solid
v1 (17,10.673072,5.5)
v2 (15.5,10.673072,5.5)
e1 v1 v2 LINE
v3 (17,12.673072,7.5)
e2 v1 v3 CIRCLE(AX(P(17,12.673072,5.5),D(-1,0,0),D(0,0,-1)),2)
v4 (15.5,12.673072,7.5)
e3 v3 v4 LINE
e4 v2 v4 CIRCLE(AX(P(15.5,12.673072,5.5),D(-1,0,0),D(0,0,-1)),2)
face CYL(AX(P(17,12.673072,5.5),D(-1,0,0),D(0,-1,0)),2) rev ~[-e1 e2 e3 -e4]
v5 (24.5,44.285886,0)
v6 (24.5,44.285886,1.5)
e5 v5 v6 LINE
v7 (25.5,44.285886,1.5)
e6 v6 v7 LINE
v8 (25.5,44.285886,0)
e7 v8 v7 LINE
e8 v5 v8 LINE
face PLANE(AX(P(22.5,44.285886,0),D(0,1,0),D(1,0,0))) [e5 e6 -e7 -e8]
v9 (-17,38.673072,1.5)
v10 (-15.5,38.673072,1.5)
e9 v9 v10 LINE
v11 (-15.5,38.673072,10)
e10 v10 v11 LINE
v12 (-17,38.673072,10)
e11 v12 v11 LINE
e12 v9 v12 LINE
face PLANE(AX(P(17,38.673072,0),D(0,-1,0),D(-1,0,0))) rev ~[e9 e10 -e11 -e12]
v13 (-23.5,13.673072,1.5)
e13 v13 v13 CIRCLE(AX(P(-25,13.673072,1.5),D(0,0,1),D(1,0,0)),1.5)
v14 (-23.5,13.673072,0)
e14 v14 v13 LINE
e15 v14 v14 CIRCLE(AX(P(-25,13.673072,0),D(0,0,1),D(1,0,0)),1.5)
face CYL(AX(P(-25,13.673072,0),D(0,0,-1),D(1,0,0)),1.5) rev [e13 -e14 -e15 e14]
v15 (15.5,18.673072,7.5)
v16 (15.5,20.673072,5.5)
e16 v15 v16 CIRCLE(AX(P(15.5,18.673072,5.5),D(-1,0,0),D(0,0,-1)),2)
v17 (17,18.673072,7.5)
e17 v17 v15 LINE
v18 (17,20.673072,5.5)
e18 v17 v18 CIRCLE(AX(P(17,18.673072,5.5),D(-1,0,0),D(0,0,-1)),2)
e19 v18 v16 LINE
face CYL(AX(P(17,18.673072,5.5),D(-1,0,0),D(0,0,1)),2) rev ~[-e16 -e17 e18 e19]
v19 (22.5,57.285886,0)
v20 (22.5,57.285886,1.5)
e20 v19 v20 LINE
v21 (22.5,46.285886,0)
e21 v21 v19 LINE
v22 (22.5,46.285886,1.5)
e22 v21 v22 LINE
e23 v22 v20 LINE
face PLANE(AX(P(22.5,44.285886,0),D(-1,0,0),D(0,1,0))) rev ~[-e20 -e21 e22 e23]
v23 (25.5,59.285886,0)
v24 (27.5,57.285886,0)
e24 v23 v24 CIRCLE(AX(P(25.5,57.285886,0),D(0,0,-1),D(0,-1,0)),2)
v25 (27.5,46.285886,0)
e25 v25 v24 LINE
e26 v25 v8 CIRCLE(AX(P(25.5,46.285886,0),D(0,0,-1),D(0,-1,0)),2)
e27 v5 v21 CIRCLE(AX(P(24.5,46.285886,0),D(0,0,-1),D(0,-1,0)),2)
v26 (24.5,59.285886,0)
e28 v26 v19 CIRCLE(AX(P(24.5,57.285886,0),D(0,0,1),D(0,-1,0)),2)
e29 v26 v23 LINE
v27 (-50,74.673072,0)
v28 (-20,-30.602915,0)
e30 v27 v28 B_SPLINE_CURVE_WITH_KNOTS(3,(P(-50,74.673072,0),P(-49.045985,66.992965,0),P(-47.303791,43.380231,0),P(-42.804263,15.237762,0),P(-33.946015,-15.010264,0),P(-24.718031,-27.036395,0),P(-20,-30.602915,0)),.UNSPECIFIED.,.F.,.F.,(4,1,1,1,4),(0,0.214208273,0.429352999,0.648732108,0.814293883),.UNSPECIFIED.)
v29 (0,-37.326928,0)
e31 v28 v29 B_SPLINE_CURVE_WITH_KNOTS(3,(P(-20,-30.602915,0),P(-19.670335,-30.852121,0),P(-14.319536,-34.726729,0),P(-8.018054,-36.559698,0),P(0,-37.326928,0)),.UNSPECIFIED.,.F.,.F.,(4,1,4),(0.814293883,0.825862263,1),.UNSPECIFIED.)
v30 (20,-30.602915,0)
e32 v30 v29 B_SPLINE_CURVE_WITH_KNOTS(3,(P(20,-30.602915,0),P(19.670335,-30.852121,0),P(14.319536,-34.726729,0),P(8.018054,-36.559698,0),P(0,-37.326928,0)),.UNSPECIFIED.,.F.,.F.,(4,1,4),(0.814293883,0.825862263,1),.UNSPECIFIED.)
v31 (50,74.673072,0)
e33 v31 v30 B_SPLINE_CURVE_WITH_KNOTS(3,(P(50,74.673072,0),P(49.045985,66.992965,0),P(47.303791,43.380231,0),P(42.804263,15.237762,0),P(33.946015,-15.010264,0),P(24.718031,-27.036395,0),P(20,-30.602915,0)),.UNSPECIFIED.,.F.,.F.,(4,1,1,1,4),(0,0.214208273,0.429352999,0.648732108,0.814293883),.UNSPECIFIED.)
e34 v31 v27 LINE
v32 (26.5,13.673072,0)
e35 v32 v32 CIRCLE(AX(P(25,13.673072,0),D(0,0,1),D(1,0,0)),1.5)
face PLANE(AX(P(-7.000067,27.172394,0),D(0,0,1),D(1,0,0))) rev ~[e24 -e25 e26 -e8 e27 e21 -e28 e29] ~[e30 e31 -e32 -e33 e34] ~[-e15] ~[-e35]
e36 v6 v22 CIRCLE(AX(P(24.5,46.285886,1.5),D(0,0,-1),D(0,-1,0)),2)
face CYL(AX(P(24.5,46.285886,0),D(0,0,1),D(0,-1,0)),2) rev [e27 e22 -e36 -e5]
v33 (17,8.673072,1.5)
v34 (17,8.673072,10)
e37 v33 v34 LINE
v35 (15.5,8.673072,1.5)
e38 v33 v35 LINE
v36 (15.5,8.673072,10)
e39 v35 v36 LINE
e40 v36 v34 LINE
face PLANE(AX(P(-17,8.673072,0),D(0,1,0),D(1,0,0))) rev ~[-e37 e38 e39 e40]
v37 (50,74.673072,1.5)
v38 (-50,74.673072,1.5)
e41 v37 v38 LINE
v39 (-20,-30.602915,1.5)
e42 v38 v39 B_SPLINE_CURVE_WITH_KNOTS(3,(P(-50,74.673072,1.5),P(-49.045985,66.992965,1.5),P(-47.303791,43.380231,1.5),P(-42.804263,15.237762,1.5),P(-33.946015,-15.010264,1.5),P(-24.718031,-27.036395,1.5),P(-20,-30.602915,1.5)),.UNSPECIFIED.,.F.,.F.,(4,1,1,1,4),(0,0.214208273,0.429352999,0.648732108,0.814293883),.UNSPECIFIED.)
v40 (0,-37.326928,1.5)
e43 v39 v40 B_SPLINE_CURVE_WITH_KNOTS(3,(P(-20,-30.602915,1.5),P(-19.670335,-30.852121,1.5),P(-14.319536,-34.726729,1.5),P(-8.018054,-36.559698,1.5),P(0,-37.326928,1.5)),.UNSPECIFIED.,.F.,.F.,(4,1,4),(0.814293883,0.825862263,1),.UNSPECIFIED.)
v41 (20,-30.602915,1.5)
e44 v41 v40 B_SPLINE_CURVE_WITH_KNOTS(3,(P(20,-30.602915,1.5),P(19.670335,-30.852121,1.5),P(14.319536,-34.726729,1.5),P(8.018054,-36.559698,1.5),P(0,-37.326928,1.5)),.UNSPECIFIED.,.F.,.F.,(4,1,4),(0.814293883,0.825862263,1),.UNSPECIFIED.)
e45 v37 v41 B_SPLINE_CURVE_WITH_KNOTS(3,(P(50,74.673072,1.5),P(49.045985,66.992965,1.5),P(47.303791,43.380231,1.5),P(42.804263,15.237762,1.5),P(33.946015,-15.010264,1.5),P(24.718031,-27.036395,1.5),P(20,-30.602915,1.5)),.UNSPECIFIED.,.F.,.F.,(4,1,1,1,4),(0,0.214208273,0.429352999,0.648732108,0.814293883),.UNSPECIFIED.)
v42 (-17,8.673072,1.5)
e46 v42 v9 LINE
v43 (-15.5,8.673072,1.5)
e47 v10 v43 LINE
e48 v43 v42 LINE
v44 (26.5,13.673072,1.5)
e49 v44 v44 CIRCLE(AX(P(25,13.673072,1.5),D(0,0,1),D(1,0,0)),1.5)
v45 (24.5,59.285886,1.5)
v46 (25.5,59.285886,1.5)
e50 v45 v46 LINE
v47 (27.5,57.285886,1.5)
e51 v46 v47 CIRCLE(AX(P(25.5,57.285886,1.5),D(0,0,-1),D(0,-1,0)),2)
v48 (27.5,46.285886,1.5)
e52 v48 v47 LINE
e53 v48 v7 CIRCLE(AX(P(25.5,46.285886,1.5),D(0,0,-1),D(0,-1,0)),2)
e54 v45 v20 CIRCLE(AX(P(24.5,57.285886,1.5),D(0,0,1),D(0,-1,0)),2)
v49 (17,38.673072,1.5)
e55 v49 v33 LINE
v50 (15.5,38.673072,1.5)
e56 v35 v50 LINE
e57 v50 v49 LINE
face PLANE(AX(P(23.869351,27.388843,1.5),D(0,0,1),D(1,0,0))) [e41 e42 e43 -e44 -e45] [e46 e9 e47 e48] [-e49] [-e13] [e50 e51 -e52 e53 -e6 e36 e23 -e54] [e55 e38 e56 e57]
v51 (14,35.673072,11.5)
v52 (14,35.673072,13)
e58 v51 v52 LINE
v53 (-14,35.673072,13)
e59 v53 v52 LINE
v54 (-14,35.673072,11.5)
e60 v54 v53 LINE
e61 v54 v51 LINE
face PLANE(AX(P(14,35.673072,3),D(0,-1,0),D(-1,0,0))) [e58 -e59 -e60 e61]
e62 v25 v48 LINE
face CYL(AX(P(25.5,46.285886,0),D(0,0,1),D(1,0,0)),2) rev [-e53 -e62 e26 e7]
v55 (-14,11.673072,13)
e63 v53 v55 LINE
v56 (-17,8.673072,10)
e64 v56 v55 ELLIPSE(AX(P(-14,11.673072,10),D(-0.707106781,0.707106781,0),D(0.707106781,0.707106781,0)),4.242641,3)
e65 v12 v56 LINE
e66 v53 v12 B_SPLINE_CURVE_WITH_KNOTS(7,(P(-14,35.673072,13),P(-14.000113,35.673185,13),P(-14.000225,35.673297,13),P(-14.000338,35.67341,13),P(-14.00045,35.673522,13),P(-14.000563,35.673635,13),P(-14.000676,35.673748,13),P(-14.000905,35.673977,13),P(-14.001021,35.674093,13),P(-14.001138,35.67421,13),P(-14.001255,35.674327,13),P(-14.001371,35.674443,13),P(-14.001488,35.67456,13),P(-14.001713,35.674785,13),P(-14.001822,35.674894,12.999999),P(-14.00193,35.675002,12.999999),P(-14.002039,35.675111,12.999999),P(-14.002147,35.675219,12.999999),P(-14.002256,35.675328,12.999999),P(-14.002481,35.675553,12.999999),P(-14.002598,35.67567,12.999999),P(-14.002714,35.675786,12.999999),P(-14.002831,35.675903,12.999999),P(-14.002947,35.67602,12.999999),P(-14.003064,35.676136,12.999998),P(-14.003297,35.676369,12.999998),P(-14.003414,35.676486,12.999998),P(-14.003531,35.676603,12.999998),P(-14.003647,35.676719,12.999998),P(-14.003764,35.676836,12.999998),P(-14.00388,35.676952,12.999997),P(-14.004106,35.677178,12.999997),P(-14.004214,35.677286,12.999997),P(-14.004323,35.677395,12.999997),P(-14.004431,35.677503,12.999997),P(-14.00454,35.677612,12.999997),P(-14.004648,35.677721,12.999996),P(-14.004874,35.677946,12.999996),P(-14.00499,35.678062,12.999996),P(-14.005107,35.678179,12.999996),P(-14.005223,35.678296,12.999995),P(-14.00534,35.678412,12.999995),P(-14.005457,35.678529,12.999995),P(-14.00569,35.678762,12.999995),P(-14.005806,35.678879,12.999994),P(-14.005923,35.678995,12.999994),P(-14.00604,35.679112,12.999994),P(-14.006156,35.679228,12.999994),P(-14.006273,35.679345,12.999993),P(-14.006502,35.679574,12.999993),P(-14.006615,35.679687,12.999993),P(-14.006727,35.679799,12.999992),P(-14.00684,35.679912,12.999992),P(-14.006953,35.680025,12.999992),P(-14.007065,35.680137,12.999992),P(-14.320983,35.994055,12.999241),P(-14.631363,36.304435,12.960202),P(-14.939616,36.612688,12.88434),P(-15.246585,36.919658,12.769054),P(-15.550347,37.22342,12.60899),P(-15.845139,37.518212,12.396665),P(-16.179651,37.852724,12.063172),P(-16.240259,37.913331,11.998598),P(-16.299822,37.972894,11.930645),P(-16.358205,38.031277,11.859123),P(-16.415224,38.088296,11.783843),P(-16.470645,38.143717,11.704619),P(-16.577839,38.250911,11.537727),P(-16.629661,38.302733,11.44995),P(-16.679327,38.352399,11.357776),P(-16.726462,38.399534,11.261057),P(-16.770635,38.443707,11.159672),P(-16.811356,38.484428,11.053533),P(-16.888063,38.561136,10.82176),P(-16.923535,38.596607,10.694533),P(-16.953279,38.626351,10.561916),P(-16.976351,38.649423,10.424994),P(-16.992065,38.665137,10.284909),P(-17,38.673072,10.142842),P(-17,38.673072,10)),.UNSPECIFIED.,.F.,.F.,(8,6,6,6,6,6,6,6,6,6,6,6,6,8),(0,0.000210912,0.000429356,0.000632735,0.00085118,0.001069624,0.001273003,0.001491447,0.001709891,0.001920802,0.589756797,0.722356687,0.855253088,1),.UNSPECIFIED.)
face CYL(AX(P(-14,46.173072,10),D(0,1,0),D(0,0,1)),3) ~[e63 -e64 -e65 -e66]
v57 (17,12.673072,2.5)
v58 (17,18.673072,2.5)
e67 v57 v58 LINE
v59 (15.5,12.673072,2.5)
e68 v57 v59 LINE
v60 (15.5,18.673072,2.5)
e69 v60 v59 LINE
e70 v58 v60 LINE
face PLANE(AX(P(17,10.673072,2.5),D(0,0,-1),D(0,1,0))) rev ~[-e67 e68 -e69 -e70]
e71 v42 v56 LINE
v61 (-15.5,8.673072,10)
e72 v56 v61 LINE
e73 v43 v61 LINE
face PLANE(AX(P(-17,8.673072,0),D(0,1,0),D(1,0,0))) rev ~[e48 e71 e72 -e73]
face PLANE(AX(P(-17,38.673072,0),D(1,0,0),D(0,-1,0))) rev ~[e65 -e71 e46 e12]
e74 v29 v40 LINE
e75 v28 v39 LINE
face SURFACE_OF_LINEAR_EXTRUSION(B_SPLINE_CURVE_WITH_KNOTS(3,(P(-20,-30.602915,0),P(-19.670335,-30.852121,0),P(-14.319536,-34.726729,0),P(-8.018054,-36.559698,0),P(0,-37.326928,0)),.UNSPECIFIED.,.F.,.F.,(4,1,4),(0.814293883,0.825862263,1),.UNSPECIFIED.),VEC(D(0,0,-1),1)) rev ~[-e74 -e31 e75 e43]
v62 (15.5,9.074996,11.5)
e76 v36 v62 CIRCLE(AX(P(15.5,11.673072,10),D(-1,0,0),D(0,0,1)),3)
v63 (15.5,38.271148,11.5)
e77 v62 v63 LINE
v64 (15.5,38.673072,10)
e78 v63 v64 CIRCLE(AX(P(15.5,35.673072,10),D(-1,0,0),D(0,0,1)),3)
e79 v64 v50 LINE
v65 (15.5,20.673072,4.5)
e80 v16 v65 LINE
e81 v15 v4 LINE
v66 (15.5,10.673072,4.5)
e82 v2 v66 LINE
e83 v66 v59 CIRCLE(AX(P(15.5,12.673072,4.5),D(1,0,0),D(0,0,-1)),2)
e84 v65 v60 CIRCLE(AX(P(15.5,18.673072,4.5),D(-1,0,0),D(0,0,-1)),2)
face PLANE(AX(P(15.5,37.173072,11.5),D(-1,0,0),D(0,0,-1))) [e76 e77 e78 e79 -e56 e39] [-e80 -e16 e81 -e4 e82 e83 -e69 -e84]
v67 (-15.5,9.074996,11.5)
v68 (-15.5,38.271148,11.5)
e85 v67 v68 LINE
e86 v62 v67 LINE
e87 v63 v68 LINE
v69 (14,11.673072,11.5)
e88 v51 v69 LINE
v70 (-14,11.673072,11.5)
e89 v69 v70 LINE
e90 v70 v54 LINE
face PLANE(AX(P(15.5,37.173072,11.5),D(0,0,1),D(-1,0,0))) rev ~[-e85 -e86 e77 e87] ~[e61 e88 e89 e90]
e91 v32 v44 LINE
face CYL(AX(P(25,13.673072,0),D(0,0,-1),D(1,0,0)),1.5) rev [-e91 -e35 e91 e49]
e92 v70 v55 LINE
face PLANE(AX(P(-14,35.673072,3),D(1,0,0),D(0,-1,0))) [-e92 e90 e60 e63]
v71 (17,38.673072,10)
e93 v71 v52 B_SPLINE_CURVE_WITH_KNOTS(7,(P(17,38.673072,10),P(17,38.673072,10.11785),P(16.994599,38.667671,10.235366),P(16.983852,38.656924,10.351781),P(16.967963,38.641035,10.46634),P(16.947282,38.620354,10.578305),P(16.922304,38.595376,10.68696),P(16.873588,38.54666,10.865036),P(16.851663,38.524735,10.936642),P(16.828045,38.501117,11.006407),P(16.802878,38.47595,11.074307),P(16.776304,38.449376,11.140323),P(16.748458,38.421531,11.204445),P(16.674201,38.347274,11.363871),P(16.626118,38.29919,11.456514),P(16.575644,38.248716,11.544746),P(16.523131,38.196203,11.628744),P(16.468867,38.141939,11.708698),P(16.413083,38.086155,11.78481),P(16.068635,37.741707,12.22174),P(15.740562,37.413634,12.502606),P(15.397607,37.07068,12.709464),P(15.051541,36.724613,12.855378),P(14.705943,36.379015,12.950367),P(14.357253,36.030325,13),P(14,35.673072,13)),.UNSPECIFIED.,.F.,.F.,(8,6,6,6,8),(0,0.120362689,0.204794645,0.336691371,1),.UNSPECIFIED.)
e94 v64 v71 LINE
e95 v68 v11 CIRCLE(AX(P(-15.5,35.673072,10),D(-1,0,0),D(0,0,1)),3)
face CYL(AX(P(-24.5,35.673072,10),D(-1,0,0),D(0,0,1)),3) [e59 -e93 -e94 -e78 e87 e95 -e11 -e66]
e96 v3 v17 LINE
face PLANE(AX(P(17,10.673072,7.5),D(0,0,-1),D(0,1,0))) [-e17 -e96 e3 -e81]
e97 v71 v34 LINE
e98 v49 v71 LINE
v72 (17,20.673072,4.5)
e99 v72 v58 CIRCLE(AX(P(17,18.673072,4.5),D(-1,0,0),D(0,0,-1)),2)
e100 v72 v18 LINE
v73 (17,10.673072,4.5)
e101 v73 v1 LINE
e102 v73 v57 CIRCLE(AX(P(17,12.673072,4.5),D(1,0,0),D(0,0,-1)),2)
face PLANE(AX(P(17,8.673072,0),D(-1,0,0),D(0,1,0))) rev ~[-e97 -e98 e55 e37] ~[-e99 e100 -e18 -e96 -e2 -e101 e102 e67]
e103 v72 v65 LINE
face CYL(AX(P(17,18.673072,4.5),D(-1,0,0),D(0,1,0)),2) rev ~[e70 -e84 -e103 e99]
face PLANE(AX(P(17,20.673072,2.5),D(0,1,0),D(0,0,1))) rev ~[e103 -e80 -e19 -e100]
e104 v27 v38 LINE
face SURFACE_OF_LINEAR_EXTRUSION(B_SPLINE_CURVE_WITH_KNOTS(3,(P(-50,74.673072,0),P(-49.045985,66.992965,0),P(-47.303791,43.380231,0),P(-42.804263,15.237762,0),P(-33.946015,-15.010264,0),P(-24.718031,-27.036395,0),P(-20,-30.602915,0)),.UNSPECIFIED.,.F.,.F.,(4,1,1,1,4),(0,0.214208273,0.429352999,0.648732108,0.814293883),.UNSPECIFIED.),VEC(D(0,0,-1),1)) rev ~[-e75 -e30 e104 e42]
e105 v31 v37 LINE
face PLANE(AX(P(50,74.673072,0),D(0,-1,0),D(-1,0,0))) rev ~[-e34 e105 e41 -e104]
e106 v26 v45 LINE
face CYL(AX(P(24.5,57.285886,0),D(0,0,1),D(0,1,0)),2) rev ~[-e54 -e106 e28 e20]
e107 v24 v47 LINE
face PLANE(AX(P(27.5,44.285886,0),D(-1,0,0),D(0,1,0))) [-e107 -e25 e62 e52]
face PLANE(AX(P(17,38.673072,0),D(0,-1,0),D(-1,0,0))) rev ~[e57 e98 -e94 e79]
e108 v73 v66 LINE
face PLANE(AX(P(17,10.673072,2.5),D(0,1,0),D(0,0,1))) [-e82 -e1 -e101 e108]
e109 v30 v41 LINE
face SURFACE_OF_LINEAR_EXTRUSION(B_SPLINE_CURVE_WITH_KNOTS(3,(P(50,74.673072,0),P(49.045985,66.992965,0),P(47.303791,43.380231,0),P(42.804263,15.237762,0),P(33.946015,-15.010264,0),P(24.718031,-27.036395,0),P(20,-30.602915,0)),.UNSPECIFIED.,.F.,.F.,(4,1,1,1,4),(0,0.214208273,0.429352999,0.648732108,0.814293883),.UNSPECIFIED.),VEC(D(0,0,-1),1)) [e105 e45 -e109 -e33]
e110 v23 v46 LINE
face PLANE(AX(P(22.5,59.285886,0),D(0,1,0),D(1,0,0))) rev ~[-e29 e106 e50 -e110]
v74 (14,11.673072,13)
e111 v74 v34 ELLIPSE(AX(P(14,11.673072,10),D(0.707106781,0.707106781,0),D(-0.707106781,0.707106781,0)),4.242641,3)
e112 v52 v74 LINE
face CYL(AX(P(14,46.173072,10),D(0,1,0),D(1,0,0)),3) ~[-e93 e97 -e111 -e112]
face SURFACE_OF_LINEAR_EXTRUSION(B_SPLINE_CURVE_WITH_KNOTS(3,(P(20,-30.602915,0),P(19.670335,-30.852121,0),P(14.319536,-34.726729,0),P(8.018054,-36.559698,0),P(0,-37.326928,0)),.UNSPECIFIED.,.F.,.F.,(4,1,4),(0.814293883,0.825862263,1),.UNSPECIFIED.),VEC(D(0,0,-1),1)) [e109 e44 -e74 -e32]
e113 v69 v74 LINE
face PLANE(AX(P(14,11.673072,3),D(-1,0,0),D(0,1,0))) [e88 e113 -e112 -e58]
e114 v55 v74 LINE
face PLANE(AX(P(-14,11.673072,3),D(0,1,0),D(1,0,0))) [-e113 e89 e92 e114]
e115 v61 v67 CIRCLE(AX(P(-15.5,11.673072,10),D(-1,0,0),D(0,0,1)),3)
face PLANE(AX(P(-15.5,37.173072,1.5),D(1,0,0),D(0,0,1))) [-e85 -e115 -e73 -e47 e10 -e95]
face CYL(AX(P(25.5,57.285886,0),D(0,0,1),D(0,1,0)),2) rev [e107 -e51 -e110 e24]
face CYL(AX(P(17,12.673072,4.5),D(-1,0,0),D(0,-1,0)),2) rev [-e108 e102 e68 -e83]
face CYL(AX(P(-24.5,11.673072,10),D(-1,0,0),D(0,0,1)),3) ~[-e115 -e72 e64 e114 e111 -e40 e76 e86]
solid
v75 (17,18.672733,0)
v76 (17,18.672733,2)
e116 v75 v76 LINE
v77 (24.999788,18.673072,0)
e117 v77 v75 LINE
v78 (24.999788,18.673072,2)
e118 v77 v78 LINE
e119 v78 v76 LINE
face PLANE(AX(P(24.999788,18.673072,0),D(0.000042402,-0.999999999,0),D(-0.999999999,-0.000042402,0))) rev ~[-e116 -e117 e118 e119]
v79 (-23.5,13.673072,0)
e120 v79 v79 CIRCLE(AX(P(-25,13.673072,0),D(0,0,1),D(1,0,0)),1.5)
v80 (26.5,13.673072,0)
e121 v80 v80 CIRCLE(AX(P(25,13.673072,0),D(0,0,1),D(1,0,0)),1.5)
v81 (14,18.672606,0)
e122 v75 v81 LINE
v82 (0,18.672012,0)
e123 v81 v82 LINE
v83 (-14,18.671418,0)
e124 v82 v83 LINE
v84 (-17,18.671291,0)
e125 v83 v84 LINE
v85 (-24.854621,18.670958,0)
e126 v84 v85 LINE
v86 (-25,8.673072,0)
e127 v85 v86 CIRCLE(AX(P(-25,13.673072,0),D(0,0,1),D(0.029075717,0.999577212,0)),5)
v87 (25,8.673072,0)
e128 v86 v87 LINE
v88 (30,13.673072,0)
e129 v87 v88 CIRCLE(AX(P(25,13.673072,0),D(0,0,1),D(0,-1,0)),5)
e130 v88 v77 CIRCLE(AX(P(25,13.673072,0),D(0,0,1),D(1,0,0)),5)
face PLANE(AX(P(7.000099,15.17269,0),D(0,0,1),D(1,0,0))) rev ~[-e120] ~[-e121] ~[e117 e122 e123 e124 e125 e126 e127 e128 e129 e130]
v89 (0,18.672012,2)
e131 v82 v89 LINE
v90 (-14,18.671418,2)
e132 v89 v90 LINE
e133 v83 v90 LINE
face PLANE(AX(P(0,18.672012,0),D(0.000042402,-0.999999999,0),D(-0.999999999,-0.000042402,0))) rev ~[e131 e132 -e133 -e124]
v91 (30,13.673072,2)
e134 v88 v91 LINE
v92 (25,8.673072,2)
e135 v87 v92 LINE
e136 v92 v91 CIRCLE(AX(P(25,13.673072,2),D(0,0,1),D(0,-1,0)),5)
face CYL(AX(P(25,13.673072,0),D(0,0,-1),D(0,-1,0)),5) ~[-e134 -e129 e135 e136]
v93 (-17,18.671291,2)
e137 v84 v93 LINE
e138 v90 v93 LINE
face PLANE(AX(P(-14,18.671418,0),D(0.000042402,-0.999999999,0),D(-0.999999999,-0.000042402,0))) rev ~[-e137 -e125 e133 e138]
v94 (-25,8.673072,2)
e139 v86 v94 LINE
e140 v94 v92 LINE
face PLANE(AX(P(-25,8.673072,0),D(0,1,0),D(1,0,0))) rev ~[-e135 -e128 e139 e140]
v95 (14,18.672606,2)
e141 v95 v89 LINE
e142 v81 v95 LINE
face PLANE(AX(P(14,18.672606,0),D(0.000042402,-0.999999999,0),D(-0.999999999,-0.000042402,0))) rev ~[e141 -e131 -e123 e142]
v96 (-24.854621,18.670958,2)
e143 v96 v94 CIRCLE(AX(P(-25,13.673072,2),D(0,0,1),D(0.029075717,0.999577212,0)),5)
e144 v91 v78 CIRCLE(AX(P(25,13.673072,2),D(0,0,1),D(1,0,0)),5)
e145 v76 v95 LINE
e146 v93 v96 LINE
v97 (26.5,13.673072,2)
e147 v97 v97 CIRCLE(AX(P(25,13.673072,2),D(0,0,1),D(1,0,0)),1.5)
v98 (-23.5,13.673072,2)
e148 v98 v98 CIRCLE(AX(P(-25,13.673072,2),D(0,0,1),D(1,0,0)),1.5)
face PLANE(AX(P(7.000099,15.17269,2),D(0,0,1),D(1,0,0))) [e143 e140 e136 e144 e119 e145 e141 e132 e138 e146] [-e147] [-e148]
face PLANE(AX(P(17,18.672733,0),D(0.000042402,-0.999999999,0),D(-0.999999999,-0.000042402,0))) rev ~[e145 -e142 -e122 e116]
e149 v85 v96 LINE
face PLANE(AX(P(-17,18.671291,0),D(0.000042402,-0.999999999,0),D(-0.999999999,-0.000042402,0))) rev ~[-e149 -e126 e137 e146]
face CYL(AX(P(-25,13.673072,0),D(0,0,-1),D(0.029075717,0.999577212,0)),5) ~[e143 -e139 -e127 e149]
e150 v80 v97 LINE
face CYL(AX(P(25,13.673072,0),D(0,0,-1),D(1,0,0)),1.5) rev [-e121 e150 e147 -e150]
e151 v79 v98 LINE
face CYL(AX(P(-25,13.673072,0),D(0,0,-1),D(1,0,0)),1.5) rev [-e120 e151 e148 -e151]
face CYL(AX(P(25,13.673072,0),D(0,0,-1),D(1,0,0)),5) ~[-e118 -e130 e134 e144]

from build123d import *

# Parameters (mm, degrees)
F0_R        = 6
F0_W        = 5
F0_H        = 15
F0_R_2      = 3
F0_R_3      = 1.5
F1_DEPTH    = 1.5
F2_DEPTH    = 13
F3_T        = -1.5
F4_T1_DEPTH = 45
F4_T3_DEPTH = 49
F5_R        = 2
F6_DEPTH    = 2
F7_START    = 3
F7_DEPTH    = 22
F8_W        = 10
F8_H        = 5
F9_DEPTH    = 5
F10_R       = 2


# Not quite as in the source:
# - a fillet or chamfer that OpenCascade refuses, or shapes differently, is made with other operations: its cross-section is extruded or revolved along the edge and cut away or added


with BuildPart() as f1:
    # F0 (on Top) → F1 (new body)
    with BuildSketch(Plane.XY):
        with BuildLine():
            Line((50, 74.6730720997), (0, 74.6730720997))
            Line((0, 74.6730720997), (0, 69.6730720997))
            Line((0, 69.6730720997), (0, 64.6730720997))
            Line((0, 64.6730720997), (0, 38.6730720997))
            Line((0, 38.6730720997), (17, 38.6730720997))
            Line((17, 38.6730720997), (17, 18.6727328867))
            Line((17, 18.6727328867), (24.9997879891, 18.6730720952))
            ThreePointArc((24.9997879891, 18.6730720952), (28.535458948, 17.208680962), (30, 13.6730720997))
            ThreePointArc((30, 13.6730720997), (28.5355339059, 10.1375381938), (25, 8.6730720997))
            Line((25, 8.6730720997), (17, 8.6730720997))
            Line((17, 8.6730720997), (0, 8.6730720997))
            Line((0, 8.6730720997), (0, 7.6730720997))
            Line((0, 7.6730720997), (20, 7.6730720997))
            Line((20, 7.6730720997), (20, -1.4825001728))
            ThreePointArc((20, -1.4825001728), (23.3406734607, -3.5949503292), (24.642552197, -7.3269279003))
            ThreePointArc((24.642552197, -7.3269279003), (23.3406734607, -11.0589054714), (20, -13.1713556278))
            Line((20, -13.1713556278), (20, -30.6029154708))
            add(Edge.make_bspline(
                [(50, 74.6730720997), (49.0459845068, 66.9929651356), (47.3037907792, 43.380231158), (42.8042626578, 15.237762147), (33.9460152145, -15.0102641191), (24.7180314416, -27.0363946308), (20, -30.6029154708)],
                knots=[0, 0, 0, 0, 0.2142082733, 0.4293529985, 0.6487321082, 0.8142938826, 0.8142938826, 0.8142938826, 0.8142938826], degree=3))
        make_face()
        with Locations((29.4684451073, 27.5630913675)):
            Circle(F0_R, mode=Mode.SUBTRACT)
        with Locations((15, 61.6730720997)):
            Circle(F0_R, mode=Mode.SUBTRACT)
        with Locations((25, 51.7858859897)):
            Rectangle(F0_W, F0_H, mode=Mode.SUBTRACT)
        with Locations((35, 61.6730720997)):
            Circle(F0_R, mode=Mode.SUBTRACT)
        with BuildLine():
            Line((0, 69.6730720997), (0, 74.6730720997))
            Line((0, 74.6730720997), (-50, 74.6730720997))
            add(Edge.make_bspline(
                [(-50, 74.6730720997), (-49.0459845068, 66.9929651356), (-47.3037907792, 43.380231158), (-42.8042626578, 15.237762147), (-33.9460152145, -15.0102641191), (-24.7180314416, -27.0363946308), (-20, -30.6029154708)],
                knots=[0, 0, 0, 0, 0.2142082733, 0.4293529985, 0.6487321082, 0.8142938826, 0.8142938826, 0.8142938826, 0.8142938826], degree=3))
            Line((-20, -30.6029154708), (-20, -13.1713556278))
            ThreePointArc((-20, -13.1713556278), (-24.642552197, -7.3269279003), (-20, -1.4825001728))
            Line((-20, -1.4825001728), (-20, 7.6730720997))
            Line((-20, 7.6730720997), (0, 7.6730720997))
            Line((0, 7.6730720997), (0, 8.6730720997))
            Line((0, 8.6730720997), (-17, 8.6730720997))
            Line((-17, 8.6730720997), (-25, 8.6730720997))
            ThreePointArc((-25, 8.6730720997), (-29.999471487, 13.7457690764), (-24.854621415, 18.6709581595))
            Line((-24.854621415, 18.6709581595), (-17, 18.6712912126))
            Line((-17, 18.6712912126), (-17, 38.6730720997))
            Line((-17, 38.6730720997), (0, 38.6730720997))
            Line((0, 38.6730720997), (0, 64.6730720997))
            Line((0, 64.6730720997), (0, 69.6730720997))
        make_face()
        with Locations((-29.4684451073, 27.5630913675)):
            Circle(F0_R, mode=Mode.SUBTRACT)
        with Locations((-35, 61.6730720997)):
            Circle(F0_R, mode=Mode.SUBTRACT)
        with Locations((-25, 47.6730720997)):
            Circle(F0_R, mode=Mode.SUBTRACT)
        with Locations((-15, 61.6730720997)):
            Circle(F0_R, mode=Mode.SUBTRACT)
        with BuildLine():
            add(Edge.make_bspline(
                [(20, -30.6029154708), (19.6703346362, -30.85212076), (14.3195363247, -34.7267287684), (8.0180540099, -36.5596981444), (0, -37.3269279003)],
                knots=[0.8142938826, 0.8142938826, 0.8142938826, 0.8142938826, 0.825862263, 1, 1, 1, 1], degree=3))
            Line((20, -30.6029154708), (20, -13.1713556278))
            ThreePointArc((20, -13.1713556278), (12.642552197, -7.3269279003), (20, -1.4825001728))
            Line((20, -1.4825001728), (20, 7.6730720997))
            Line((20, 7.6730720997), (0, 7.6730720997))
            Line((0, 7.6730720997), (0, -1.3269279003))
            ThreePointArc((0, -1.3269279003), (4.2426406871, -3.0842872132), (6, -7.3269279003))
            ThreePointArc((6, -7.3269279003), (4.2426406871, -11.5695685874), (0, -13.3269279003))
            Line((0, -13.3269279003), (0, -21.1192360669))
            ThreePointArc((0, -21.1192360669), (4.2426406871, -22.8765953798), (6, -27.1192360669))
            ThreePointArc((6, -27.1192360669), (4.2426406871, -31.3618767541), (0, -33.1192360669))
            Line((0, -33.1192360669), (0, -37.3269279003))
        make_face()
        with BuildLine():
            Line((-20, -13.1713556278), (-20, -30.6029154708))
            add(Edge.make_bspline(
                [(-20, -30.6029154708), (-19.6703346362, -30.85212076), (-14.3195363247, -34.7267287684), (-8.0180540099, -36.5596981444), (0, -37.3269279003)],
                knots=[0.8142938826, 0.8142938826, 0.8142938826, 0.8142938826, 0.825862263, 1, 1, 1, 1], degree=3))
            Line((0, -37.3269279003), (0, -33.1192360669))
            ThreePointArc((0, -33.1192360669), (-6, -27.1192360669), (0, -21.1192360669))
            Line((0, -21.1192360669), (0, -13.3269279003))
            ThreePointArc((0, -13.3269279003), (-6, -7.3269279003), (0, -1.3269279003))
            Line((0, -1.3269279003), (0, 7.6730720997))
            Line((0, 7.6730720997), (-20, 7.6730720997))
            Line((-20, 7.6730720997), (-20, -1.4825001728))
            ThreePointArc((-20, -1.4825001728), (-14.9105746259, -2.6288066365), (-12.642552197, -7.3269279003))
            ThreePointArc((-12.642552197, -7.3269279003), (-14.9105746259, -12.0250491641), (-20, -13.1713556278))
        make_face()
        with BuildLine():
            ThreePointArc((20, -1.4825001728), (12.642552197, -7.3269279003), (20, -13.1713556278))
            Line((20, -13.1713556278), (20, -1.4825001728))
        make_face()
        with BuildLine():
            Line((20, -1.4825001728), (20, -13.1713556278))
            ThreePointArc((20, -13.1713556278), (23.3406734607, -11.0589054714), (24.642552197, -7.3269279003))
            ThreePointArc((24.642552197, -7.3269279003), (23.3406734607, -3.5949503292), (20, -1.4825001728))
        make_face()
        Polygon((17, 38.6730720997), (0, 38.6730720997), (0, 35.6730720997), (14, 35.6730720997), (14, 18.6726056802), (17, 18.6727328867), align=None)
        Polygon((0, 35.6730720997), (0, 38.6730720997), (-17, 38.6730720997), (-17, 18.6712912126), (-14, 18.6714184191), (-14, 35.6730720997), align=None)
        with BuildLine():
            ThreePointArc((-20, -1.4825001728), (-24.642552197, -7.3269279003), (-20, -13.1713556278))
            Line((-20, -13.1713556278), (-20, -1.4825001728))
        make_face()
        with BuildLine():
            Line((-20, -1.4825001728), (-20, -13.1713556278))
            ThreePointArc((-20, -13.1713556278), (-14.9105746259, -12.0250491641), (-12.642552197, -7.3269279003))
            ThreePointArc((-12.642552197, -7.3269279003), (-14.9105746259, -2.6288066365), (-20, -1.4825001728))
        make_face()
        with BuildLine():
            ThreePointArc((0, -21.1192360669), (-6, -27.1192360669), (0, -33.1192360669))
            Line((0, -33.1192360669), (0, -21.1192360669))
        make_face()
        with BuildLine():
            Line((0, -21.1192360669), (0, -33.1192360669))
            ThreePointArc((0, -33.1192360669), (4.2426406871, -31.3618767541), (6, -27.1192360669))
            ThreePointArc((6, -27.1192360669), (4.2426406871, -22.8765953798), (0, -21.1192360669))
        make_face()
        Polygon((14, 35.6730720997), (0, 35.6730720997), (0, 18.6720120497), (14, 18.6726056802), align=None)
        Polygon((0, 18.6720120497), (0, 35.6730720997), (-14, 35.6730720997), (-14, 18.6714184191), align=None)
        Polygon((14, 18.6726056802), (0, 18.6720120497), (0, 11.6730720997), (14, 11.6730720997), align=None)
        Polygon((0, 11.6730720997), (0, 18.6720120497), (-14, 18.6714184191), (-14, 11.6730720997), align=None)
        with BuildLine():
            Line((24.9997879891, 18.6730720952), (17, 18.6727328867))
            Line((17, 18.6727328867), (17, 8.6730720997))
            Line((17, 8.6730720997), (25, 8.6730720997))
            ThreePointArc((25, 8.6730720997), (20.0000000011, 13.6729660942), (24.9997879891, 18.6730720952))
        make_face()
        Polygon((17, 8.6730720997), (17, 18.6727328867), (14, 18.6726056802), (14, 11.6730720997), (0, 11.6730720997), (0, 8.6730720997), align=None)
        Polygon((-14, 18.6714184191), (-17, 18.6712912126), (-17, 8.6730720997), (0, 8.6730720997), (0, 11.6730720997), (-14, 11.6730720997), align=None)
        with BuildLine():
            Line((-17, 8.6730720997), (-17, 18.6712912126))
            Line((-17, 18.6712912126), (-24.854621415, 18.6709581595))
            ThreePointArc((-24.854621415, 18.6709581595), (-21.4134352839, 17.1568277653), (-20, 13.6730720997))
            ThreePointArc((-20, 13.6730720997), (-21.4644660941, 10.1375381938), (-25, 8.6730720997))
            Line((-25, 8.6730720997), (-17, 8.6730720997))
        make_face()
        with BuildLine():
            ThreePointArc((0, -1.3269279003), (-6, -7.3269279003), (0, -13.3269279003))
            Line((0, -13.3269279003), (0, -1.3269279003))
        make_face()
        with BuildLine():
            Line((0, -1.3269279003), (0, -13.3269279003))
            ThreePointArc((0, -13.3269279003), (4.2426406871, -11.5695685874), (6, -7.3269279003))
            ThreePointArc((6, -7.3269279003), (4.2426406871, -3.0842872132), (0, -1.3269279003))
        make_face()
        with BuildLine():
            ThreePointArc((30, 13.6730720997), (28.535458948, 17.208680962), (24.9997879891, 18.6730720952))
            ThreePointArc((24.9997879891, 18.6730720952), (20.0000000011, 13.6729660942), (25, 8.6730720997))
            ThreePointArc((25, 8.6730720997), (28.5355339059, 10.1375381938), (30, 13.6730720997))
        make_face()
        with Locations((25, 13.6730720997)):
            Circle(F0_R_2, mode=Mode.SUBTRACT)
        with BuildLine():
            ThreePointArc((-20, 13.6730720997), (-21.4134352839, 17.1568277653), (-24.854621415, 18.6709581595))
            ThreePointArc((-24.854621415, 18.6709581595), (-29.999471487, 13.7457690764), (-25, 8.6730720997))
            ThreePointArc((-25, 8.6730720997), (-21.4644660941, 10.1375381938), (-20, 13.6730720997))
        make_face()
        with Locations((-25, 13.6730720997)):
            Circle(F0_R_2, mode=Mode.SUBTRACT)
        with Locations((-25, 13.6730720997)):
            Circle(F0_R_2)
        with Locations((-25, 13.6730720997)):
            Circle(F0_R_3, mode=Mode.SUBTRACT)
        with Locations((25, 13.6730720997)):
            Circle(F0_R_2)
        with Locations((25, 13.6730720997)):
            Circle(F0_R_3, mode=Mode.SUBTRACT)
        with Locations((-35, 61.6730720997)):
            Circle(F0_R)
        with Locations((-15, 61.6730720997)):
            Circle(F0_R)
        with Locations((-25, 47.6730720997)):
            Circle(F0_R)
        with Locations((-29.4684451073, 27.5630913675)):
            Circle(F0_R)
        with Locations((35, 61.6730720997)):
            Circle(F0_R)
        with Locations((29.4684451073, 27.5630913675)):
            Circle(F0_R)
        with Locations((15, 61.6730720997)):
            Circle(F0_R)
    extrude(amount=F1_DEPTH)

    # F0 (on Top) → F2 (join)
    with BuildSketch(Plane.XY):
        Polygon((0, 18.6720120497), (0, 35.6730720997), (-14, 35.6730720997), (-14, 18.6714184191), align=None)
        Polygon((14, 35.6730720997), (0, 35.6730720997), (0, 18.6720120497), (14, 18.6726056802), align=None)
        Polygon((14, 18.6726056802), (0, 18.6720120497), (0, 11.6730720997), (14, 11.6730720997), align=None)
        Polygon((0, 11.6730720997), (0, 18.6720120497), (-14, 18.6714184191), (-14, 11.6730720997), align=None)
        Polygon((0, 35.6730720997), (0, 38.6730720997), (-17, 38.6730720997), (-17, 18.6712912126), (-14, 18.6714184191), (-14, 35.6730720997), align=None)
        Polygon((17, 38.6730720997), (0, 38.6730720997), (0, 35.6730720997), (14, 35.6730720997), (14, 18.6726056802), (17, 18.6727328867), align=None)
        Polygon((17, 8.6730720997), (17, 18.6727328867), (14, 18.6726056802), (14, 11.6730720997), (0, 11.6730720997), (0, 8.6730720997), align=None)
        Polygon((-14, 18.6714184191), (-17, 18.6712912126), (-17, 8.6730720997), (0, 8.6730720997), (0, 11.6730720997), (-14, 11.6730720997), align=None)
    extrude(amount=F2_DEPTH)

    # F3: a shell. OpenCascade refuses it in one call, so the cavity is built on its own and cut out:
    # the body offset inwards by the wall thickness, plus a prism from it out through each open face.
    f3_core = offset(f1.part, amount=F3_T, kind=Kind.INTERSECTION, mode=Mode.PRIVATE)
    f3_exits = [f3_core.faces().sort_by_distance(p)[0] for p in [
        (0, 10.173072, 6.5),
        (0, 37.173072, 6.5),
    ]]
    add(f3_core, mode=Mode.SUBTRACT)
    extrude(f3_exits, amount=-F3_T, mode=Mode.SUBTRACT)

    # F4: fillet of radius 3 on 4 edges, made by hand

    # F4_s2 → F4_t1 (cut)
    with BuildSketch(Plane.XZ.offset(-46.1730720997)):
        with BuildLine():
            ThreePointArc((-14, 13), (-16.1213203436, 12.1213203436), (-17, 10))
            Line((-17, 10), (-17, 13))
            Line((-17, 13), (-14, 13))
        make_face()
        with BuildLine():
            ThreePointArc((17, 10), (16.1213203436, 12.1213203436), (14, 13))
            Line((14, 13), (17, 13))
            Line((17, 13), (17, 10))
        make_face()
    extrude(amount=F4_T1_DEPTH, mode=Mode.SUBTRACT)

    # F4_s4 → F4_t3 (cut)
    with BuildSketch(Plane.YZ.offset(-24.5)):
        with BuildLine():
            ThreePointArc((11.6730720997, 13), (9.5517517561, 12.1213203436), (8.6730720997, 10))
            Line((8.6730720997, 10), (8.6730720997, 13))
            Line((8.6730720997, 13), (11.6730720997, 13))
        make_face()
        with BuildLine():
            ThreePointArc((35.6730720997, 13), (37.7943924432, 12.1213203436), (38.6730720997, 10))
            Line((38.6730720997, 10), (38.6730720997, 13))
            Line((38.6730720997, 13), (35.6730720997, 13))
        make_face()
    extrude(amount=F4_T3_DEPTH, mode=Mode.SUBTRACT)

    # F5
    f5_edges = [f1.edges().sort_by_distance(p)[0] for p in [
        (22.5, 59.285886, 0.75),
        (27.5, 59.285886, 0.75),
        (27.5, 44.285886, 0.75),
        (22.5, 44.285886, 0.75),
    ]]
    fillet(f5_edges, radius=F5_R)

    # F0 (on Top) → F7 (cut)
    with BuildSketch(Plane.XY.offset(F7_START)):
        Polygon((0, 18.6720120497), (0, 35.6730720997), (-14, 35.6730720997), (-14, 18.6714184191), align=None)
        Polygon((14, 35.6730720997), (0, 35.6730720997), (0, 18.6720120497), (14, 18.6726056802), align=None)
        Polygon((14, 18.6726056802), (0, 18.6720120497), (0, 11.6730720997), (14, 11.6730720997), align=None)
        Polygon((0, 11.6730720997), (0, 18.6720120497), (-14, 18.6714184191), (-14, 11.6730720997), align=None)
    extrude(amount=F7_DEPTH, mode=Mode.SUBTRACT)

    # F8 (on face) → F9 (cut)
    with BuildSketch(Plane.YZ.offset(17)):
        with Locations((15.6730720997, 5)):
            Rectangle(F8_W, F8_H)
    extrude(amount=-F9_DEPTH, mode=Mode.SUBTRACT)

    # F10
    f10_edges = [f1.edges().sort_by_distance(p)[0] for p in [
        (16.25, 20.673072, 2.5),
        (16.25, 20.673072, 7.5),
        (16.25, 10.673072, 7.5),
        (16.25, 10.673072, 2.5),
    ]]
    fillet(f10_edges, radius=F10_R)


with BuildPart() as f6:
    # F0 (on Top) → F6 (new body)
    with BuildSketch(Plane.XY):
        Polygon((14, 18.6726056802), (0, 18.6720120497), (0, 11.6730720997), (14, 11.6730720997), align=None)
        Polygon((0, 11.6730720997), (0, 18.6720120497), (-14, 18.6714184191), (-14, 11.6730720997), align=None)
        with BuildLine():
            Line((24.9997879891, 18.6730720952), (17, 18.6727328867))
            Line((17, 18.6727328867), (17, 8.6730720997))
            Line((17, 8.6730720997), (25, 8.6730720997))
            ThreePointArc((25, 8.6730720997), (20.0000000011, 13.6729660942), (24.9997879891, 18.6730720952))
        make_face()
        Polygon((17, 8.6730720997), (17, 18.6727328867), (14, 18.6726056802), (14, 11.6730720997), (0, 11.6730720997), (0, 8.6730720997), align=None)
        Polygon((-14, 18.6714184191), (-17, 18.6712912126), (-17, 8.6730720997), (0, 8.6730720997), (0, 11.6730720997), (-14, 11.6730720997), align=None)
        with BuildLine():
            Line((-17, 8.6730720997), (-17, 18.6712912126))
            Line((-17, 18.6712912126), (-24.854621415, 18.6709581595))
            ThreePointArc((-24.854621415, 18.6709581595), (-21.4134352839, 17.1568277653), (-20, 13.6730720997))
            ThreePointArc((-20, 13.6730720997), (-21.4644660941, 10.1375381938), (-25, 8.6730720997))
            Line((-25, 8.6730720997), (-17, 8.6730720997))
        make_face()
        with BuildLine():
            ThreePointArc((30, 13.6730720997), (28.535458948, 17.208680962), (24.9997879891, 18.6730720952))
            ThreePointArc((24.9997879891, 18.6730720952), (20.0000000011, 13.6729660942), (25, 8.6730720997))
            ThreePointArc((25, 8.6730720997), (28.5355339059, 10.1375381938), (30, 13.6730720997))
        make_face()
        with Locations((25, 13.6730720997)):
            Circle(F0_R_2, mode=Mode.SUBTRACT)
        with BuildLine():
            ThreePointArc((-20, 13.6730720997), (-21.4134352839, 17.1568277653), (-24.854621415, 18.6709581595))
            ThreePointArc((-24.854621415, 18.6709581595), (-29.999471487, 13.7457690764), (-25, 8.6730720997))
            ThreePointArc((-25, 8.6730720997), (-21.4644660941, 10.1375381938), (-20, 13.6730720997))
        make_face()
        with Locations((-25, 13.6730720997)):
            Circle(F0_R_2, mode=Mode.SUBTRACT)
        with Locations((-25, 13.6730720997)):
            Circle(F0_R_2)
        with Locations((-25, 13.6730720997)):
            Circle(F0_R_3, mode=Mode.SUBTRACT)
        with Locations((25, 13.6730720997)):
            Circle(F0_R_2)
        with Locations((25, 13.6730720997)):
            Circle(F0_R_3, mode=Mode.SUBTRACT)
    extrude(amount=F6_DEPTH)


solid = Compound([f1.part, f6.part])
